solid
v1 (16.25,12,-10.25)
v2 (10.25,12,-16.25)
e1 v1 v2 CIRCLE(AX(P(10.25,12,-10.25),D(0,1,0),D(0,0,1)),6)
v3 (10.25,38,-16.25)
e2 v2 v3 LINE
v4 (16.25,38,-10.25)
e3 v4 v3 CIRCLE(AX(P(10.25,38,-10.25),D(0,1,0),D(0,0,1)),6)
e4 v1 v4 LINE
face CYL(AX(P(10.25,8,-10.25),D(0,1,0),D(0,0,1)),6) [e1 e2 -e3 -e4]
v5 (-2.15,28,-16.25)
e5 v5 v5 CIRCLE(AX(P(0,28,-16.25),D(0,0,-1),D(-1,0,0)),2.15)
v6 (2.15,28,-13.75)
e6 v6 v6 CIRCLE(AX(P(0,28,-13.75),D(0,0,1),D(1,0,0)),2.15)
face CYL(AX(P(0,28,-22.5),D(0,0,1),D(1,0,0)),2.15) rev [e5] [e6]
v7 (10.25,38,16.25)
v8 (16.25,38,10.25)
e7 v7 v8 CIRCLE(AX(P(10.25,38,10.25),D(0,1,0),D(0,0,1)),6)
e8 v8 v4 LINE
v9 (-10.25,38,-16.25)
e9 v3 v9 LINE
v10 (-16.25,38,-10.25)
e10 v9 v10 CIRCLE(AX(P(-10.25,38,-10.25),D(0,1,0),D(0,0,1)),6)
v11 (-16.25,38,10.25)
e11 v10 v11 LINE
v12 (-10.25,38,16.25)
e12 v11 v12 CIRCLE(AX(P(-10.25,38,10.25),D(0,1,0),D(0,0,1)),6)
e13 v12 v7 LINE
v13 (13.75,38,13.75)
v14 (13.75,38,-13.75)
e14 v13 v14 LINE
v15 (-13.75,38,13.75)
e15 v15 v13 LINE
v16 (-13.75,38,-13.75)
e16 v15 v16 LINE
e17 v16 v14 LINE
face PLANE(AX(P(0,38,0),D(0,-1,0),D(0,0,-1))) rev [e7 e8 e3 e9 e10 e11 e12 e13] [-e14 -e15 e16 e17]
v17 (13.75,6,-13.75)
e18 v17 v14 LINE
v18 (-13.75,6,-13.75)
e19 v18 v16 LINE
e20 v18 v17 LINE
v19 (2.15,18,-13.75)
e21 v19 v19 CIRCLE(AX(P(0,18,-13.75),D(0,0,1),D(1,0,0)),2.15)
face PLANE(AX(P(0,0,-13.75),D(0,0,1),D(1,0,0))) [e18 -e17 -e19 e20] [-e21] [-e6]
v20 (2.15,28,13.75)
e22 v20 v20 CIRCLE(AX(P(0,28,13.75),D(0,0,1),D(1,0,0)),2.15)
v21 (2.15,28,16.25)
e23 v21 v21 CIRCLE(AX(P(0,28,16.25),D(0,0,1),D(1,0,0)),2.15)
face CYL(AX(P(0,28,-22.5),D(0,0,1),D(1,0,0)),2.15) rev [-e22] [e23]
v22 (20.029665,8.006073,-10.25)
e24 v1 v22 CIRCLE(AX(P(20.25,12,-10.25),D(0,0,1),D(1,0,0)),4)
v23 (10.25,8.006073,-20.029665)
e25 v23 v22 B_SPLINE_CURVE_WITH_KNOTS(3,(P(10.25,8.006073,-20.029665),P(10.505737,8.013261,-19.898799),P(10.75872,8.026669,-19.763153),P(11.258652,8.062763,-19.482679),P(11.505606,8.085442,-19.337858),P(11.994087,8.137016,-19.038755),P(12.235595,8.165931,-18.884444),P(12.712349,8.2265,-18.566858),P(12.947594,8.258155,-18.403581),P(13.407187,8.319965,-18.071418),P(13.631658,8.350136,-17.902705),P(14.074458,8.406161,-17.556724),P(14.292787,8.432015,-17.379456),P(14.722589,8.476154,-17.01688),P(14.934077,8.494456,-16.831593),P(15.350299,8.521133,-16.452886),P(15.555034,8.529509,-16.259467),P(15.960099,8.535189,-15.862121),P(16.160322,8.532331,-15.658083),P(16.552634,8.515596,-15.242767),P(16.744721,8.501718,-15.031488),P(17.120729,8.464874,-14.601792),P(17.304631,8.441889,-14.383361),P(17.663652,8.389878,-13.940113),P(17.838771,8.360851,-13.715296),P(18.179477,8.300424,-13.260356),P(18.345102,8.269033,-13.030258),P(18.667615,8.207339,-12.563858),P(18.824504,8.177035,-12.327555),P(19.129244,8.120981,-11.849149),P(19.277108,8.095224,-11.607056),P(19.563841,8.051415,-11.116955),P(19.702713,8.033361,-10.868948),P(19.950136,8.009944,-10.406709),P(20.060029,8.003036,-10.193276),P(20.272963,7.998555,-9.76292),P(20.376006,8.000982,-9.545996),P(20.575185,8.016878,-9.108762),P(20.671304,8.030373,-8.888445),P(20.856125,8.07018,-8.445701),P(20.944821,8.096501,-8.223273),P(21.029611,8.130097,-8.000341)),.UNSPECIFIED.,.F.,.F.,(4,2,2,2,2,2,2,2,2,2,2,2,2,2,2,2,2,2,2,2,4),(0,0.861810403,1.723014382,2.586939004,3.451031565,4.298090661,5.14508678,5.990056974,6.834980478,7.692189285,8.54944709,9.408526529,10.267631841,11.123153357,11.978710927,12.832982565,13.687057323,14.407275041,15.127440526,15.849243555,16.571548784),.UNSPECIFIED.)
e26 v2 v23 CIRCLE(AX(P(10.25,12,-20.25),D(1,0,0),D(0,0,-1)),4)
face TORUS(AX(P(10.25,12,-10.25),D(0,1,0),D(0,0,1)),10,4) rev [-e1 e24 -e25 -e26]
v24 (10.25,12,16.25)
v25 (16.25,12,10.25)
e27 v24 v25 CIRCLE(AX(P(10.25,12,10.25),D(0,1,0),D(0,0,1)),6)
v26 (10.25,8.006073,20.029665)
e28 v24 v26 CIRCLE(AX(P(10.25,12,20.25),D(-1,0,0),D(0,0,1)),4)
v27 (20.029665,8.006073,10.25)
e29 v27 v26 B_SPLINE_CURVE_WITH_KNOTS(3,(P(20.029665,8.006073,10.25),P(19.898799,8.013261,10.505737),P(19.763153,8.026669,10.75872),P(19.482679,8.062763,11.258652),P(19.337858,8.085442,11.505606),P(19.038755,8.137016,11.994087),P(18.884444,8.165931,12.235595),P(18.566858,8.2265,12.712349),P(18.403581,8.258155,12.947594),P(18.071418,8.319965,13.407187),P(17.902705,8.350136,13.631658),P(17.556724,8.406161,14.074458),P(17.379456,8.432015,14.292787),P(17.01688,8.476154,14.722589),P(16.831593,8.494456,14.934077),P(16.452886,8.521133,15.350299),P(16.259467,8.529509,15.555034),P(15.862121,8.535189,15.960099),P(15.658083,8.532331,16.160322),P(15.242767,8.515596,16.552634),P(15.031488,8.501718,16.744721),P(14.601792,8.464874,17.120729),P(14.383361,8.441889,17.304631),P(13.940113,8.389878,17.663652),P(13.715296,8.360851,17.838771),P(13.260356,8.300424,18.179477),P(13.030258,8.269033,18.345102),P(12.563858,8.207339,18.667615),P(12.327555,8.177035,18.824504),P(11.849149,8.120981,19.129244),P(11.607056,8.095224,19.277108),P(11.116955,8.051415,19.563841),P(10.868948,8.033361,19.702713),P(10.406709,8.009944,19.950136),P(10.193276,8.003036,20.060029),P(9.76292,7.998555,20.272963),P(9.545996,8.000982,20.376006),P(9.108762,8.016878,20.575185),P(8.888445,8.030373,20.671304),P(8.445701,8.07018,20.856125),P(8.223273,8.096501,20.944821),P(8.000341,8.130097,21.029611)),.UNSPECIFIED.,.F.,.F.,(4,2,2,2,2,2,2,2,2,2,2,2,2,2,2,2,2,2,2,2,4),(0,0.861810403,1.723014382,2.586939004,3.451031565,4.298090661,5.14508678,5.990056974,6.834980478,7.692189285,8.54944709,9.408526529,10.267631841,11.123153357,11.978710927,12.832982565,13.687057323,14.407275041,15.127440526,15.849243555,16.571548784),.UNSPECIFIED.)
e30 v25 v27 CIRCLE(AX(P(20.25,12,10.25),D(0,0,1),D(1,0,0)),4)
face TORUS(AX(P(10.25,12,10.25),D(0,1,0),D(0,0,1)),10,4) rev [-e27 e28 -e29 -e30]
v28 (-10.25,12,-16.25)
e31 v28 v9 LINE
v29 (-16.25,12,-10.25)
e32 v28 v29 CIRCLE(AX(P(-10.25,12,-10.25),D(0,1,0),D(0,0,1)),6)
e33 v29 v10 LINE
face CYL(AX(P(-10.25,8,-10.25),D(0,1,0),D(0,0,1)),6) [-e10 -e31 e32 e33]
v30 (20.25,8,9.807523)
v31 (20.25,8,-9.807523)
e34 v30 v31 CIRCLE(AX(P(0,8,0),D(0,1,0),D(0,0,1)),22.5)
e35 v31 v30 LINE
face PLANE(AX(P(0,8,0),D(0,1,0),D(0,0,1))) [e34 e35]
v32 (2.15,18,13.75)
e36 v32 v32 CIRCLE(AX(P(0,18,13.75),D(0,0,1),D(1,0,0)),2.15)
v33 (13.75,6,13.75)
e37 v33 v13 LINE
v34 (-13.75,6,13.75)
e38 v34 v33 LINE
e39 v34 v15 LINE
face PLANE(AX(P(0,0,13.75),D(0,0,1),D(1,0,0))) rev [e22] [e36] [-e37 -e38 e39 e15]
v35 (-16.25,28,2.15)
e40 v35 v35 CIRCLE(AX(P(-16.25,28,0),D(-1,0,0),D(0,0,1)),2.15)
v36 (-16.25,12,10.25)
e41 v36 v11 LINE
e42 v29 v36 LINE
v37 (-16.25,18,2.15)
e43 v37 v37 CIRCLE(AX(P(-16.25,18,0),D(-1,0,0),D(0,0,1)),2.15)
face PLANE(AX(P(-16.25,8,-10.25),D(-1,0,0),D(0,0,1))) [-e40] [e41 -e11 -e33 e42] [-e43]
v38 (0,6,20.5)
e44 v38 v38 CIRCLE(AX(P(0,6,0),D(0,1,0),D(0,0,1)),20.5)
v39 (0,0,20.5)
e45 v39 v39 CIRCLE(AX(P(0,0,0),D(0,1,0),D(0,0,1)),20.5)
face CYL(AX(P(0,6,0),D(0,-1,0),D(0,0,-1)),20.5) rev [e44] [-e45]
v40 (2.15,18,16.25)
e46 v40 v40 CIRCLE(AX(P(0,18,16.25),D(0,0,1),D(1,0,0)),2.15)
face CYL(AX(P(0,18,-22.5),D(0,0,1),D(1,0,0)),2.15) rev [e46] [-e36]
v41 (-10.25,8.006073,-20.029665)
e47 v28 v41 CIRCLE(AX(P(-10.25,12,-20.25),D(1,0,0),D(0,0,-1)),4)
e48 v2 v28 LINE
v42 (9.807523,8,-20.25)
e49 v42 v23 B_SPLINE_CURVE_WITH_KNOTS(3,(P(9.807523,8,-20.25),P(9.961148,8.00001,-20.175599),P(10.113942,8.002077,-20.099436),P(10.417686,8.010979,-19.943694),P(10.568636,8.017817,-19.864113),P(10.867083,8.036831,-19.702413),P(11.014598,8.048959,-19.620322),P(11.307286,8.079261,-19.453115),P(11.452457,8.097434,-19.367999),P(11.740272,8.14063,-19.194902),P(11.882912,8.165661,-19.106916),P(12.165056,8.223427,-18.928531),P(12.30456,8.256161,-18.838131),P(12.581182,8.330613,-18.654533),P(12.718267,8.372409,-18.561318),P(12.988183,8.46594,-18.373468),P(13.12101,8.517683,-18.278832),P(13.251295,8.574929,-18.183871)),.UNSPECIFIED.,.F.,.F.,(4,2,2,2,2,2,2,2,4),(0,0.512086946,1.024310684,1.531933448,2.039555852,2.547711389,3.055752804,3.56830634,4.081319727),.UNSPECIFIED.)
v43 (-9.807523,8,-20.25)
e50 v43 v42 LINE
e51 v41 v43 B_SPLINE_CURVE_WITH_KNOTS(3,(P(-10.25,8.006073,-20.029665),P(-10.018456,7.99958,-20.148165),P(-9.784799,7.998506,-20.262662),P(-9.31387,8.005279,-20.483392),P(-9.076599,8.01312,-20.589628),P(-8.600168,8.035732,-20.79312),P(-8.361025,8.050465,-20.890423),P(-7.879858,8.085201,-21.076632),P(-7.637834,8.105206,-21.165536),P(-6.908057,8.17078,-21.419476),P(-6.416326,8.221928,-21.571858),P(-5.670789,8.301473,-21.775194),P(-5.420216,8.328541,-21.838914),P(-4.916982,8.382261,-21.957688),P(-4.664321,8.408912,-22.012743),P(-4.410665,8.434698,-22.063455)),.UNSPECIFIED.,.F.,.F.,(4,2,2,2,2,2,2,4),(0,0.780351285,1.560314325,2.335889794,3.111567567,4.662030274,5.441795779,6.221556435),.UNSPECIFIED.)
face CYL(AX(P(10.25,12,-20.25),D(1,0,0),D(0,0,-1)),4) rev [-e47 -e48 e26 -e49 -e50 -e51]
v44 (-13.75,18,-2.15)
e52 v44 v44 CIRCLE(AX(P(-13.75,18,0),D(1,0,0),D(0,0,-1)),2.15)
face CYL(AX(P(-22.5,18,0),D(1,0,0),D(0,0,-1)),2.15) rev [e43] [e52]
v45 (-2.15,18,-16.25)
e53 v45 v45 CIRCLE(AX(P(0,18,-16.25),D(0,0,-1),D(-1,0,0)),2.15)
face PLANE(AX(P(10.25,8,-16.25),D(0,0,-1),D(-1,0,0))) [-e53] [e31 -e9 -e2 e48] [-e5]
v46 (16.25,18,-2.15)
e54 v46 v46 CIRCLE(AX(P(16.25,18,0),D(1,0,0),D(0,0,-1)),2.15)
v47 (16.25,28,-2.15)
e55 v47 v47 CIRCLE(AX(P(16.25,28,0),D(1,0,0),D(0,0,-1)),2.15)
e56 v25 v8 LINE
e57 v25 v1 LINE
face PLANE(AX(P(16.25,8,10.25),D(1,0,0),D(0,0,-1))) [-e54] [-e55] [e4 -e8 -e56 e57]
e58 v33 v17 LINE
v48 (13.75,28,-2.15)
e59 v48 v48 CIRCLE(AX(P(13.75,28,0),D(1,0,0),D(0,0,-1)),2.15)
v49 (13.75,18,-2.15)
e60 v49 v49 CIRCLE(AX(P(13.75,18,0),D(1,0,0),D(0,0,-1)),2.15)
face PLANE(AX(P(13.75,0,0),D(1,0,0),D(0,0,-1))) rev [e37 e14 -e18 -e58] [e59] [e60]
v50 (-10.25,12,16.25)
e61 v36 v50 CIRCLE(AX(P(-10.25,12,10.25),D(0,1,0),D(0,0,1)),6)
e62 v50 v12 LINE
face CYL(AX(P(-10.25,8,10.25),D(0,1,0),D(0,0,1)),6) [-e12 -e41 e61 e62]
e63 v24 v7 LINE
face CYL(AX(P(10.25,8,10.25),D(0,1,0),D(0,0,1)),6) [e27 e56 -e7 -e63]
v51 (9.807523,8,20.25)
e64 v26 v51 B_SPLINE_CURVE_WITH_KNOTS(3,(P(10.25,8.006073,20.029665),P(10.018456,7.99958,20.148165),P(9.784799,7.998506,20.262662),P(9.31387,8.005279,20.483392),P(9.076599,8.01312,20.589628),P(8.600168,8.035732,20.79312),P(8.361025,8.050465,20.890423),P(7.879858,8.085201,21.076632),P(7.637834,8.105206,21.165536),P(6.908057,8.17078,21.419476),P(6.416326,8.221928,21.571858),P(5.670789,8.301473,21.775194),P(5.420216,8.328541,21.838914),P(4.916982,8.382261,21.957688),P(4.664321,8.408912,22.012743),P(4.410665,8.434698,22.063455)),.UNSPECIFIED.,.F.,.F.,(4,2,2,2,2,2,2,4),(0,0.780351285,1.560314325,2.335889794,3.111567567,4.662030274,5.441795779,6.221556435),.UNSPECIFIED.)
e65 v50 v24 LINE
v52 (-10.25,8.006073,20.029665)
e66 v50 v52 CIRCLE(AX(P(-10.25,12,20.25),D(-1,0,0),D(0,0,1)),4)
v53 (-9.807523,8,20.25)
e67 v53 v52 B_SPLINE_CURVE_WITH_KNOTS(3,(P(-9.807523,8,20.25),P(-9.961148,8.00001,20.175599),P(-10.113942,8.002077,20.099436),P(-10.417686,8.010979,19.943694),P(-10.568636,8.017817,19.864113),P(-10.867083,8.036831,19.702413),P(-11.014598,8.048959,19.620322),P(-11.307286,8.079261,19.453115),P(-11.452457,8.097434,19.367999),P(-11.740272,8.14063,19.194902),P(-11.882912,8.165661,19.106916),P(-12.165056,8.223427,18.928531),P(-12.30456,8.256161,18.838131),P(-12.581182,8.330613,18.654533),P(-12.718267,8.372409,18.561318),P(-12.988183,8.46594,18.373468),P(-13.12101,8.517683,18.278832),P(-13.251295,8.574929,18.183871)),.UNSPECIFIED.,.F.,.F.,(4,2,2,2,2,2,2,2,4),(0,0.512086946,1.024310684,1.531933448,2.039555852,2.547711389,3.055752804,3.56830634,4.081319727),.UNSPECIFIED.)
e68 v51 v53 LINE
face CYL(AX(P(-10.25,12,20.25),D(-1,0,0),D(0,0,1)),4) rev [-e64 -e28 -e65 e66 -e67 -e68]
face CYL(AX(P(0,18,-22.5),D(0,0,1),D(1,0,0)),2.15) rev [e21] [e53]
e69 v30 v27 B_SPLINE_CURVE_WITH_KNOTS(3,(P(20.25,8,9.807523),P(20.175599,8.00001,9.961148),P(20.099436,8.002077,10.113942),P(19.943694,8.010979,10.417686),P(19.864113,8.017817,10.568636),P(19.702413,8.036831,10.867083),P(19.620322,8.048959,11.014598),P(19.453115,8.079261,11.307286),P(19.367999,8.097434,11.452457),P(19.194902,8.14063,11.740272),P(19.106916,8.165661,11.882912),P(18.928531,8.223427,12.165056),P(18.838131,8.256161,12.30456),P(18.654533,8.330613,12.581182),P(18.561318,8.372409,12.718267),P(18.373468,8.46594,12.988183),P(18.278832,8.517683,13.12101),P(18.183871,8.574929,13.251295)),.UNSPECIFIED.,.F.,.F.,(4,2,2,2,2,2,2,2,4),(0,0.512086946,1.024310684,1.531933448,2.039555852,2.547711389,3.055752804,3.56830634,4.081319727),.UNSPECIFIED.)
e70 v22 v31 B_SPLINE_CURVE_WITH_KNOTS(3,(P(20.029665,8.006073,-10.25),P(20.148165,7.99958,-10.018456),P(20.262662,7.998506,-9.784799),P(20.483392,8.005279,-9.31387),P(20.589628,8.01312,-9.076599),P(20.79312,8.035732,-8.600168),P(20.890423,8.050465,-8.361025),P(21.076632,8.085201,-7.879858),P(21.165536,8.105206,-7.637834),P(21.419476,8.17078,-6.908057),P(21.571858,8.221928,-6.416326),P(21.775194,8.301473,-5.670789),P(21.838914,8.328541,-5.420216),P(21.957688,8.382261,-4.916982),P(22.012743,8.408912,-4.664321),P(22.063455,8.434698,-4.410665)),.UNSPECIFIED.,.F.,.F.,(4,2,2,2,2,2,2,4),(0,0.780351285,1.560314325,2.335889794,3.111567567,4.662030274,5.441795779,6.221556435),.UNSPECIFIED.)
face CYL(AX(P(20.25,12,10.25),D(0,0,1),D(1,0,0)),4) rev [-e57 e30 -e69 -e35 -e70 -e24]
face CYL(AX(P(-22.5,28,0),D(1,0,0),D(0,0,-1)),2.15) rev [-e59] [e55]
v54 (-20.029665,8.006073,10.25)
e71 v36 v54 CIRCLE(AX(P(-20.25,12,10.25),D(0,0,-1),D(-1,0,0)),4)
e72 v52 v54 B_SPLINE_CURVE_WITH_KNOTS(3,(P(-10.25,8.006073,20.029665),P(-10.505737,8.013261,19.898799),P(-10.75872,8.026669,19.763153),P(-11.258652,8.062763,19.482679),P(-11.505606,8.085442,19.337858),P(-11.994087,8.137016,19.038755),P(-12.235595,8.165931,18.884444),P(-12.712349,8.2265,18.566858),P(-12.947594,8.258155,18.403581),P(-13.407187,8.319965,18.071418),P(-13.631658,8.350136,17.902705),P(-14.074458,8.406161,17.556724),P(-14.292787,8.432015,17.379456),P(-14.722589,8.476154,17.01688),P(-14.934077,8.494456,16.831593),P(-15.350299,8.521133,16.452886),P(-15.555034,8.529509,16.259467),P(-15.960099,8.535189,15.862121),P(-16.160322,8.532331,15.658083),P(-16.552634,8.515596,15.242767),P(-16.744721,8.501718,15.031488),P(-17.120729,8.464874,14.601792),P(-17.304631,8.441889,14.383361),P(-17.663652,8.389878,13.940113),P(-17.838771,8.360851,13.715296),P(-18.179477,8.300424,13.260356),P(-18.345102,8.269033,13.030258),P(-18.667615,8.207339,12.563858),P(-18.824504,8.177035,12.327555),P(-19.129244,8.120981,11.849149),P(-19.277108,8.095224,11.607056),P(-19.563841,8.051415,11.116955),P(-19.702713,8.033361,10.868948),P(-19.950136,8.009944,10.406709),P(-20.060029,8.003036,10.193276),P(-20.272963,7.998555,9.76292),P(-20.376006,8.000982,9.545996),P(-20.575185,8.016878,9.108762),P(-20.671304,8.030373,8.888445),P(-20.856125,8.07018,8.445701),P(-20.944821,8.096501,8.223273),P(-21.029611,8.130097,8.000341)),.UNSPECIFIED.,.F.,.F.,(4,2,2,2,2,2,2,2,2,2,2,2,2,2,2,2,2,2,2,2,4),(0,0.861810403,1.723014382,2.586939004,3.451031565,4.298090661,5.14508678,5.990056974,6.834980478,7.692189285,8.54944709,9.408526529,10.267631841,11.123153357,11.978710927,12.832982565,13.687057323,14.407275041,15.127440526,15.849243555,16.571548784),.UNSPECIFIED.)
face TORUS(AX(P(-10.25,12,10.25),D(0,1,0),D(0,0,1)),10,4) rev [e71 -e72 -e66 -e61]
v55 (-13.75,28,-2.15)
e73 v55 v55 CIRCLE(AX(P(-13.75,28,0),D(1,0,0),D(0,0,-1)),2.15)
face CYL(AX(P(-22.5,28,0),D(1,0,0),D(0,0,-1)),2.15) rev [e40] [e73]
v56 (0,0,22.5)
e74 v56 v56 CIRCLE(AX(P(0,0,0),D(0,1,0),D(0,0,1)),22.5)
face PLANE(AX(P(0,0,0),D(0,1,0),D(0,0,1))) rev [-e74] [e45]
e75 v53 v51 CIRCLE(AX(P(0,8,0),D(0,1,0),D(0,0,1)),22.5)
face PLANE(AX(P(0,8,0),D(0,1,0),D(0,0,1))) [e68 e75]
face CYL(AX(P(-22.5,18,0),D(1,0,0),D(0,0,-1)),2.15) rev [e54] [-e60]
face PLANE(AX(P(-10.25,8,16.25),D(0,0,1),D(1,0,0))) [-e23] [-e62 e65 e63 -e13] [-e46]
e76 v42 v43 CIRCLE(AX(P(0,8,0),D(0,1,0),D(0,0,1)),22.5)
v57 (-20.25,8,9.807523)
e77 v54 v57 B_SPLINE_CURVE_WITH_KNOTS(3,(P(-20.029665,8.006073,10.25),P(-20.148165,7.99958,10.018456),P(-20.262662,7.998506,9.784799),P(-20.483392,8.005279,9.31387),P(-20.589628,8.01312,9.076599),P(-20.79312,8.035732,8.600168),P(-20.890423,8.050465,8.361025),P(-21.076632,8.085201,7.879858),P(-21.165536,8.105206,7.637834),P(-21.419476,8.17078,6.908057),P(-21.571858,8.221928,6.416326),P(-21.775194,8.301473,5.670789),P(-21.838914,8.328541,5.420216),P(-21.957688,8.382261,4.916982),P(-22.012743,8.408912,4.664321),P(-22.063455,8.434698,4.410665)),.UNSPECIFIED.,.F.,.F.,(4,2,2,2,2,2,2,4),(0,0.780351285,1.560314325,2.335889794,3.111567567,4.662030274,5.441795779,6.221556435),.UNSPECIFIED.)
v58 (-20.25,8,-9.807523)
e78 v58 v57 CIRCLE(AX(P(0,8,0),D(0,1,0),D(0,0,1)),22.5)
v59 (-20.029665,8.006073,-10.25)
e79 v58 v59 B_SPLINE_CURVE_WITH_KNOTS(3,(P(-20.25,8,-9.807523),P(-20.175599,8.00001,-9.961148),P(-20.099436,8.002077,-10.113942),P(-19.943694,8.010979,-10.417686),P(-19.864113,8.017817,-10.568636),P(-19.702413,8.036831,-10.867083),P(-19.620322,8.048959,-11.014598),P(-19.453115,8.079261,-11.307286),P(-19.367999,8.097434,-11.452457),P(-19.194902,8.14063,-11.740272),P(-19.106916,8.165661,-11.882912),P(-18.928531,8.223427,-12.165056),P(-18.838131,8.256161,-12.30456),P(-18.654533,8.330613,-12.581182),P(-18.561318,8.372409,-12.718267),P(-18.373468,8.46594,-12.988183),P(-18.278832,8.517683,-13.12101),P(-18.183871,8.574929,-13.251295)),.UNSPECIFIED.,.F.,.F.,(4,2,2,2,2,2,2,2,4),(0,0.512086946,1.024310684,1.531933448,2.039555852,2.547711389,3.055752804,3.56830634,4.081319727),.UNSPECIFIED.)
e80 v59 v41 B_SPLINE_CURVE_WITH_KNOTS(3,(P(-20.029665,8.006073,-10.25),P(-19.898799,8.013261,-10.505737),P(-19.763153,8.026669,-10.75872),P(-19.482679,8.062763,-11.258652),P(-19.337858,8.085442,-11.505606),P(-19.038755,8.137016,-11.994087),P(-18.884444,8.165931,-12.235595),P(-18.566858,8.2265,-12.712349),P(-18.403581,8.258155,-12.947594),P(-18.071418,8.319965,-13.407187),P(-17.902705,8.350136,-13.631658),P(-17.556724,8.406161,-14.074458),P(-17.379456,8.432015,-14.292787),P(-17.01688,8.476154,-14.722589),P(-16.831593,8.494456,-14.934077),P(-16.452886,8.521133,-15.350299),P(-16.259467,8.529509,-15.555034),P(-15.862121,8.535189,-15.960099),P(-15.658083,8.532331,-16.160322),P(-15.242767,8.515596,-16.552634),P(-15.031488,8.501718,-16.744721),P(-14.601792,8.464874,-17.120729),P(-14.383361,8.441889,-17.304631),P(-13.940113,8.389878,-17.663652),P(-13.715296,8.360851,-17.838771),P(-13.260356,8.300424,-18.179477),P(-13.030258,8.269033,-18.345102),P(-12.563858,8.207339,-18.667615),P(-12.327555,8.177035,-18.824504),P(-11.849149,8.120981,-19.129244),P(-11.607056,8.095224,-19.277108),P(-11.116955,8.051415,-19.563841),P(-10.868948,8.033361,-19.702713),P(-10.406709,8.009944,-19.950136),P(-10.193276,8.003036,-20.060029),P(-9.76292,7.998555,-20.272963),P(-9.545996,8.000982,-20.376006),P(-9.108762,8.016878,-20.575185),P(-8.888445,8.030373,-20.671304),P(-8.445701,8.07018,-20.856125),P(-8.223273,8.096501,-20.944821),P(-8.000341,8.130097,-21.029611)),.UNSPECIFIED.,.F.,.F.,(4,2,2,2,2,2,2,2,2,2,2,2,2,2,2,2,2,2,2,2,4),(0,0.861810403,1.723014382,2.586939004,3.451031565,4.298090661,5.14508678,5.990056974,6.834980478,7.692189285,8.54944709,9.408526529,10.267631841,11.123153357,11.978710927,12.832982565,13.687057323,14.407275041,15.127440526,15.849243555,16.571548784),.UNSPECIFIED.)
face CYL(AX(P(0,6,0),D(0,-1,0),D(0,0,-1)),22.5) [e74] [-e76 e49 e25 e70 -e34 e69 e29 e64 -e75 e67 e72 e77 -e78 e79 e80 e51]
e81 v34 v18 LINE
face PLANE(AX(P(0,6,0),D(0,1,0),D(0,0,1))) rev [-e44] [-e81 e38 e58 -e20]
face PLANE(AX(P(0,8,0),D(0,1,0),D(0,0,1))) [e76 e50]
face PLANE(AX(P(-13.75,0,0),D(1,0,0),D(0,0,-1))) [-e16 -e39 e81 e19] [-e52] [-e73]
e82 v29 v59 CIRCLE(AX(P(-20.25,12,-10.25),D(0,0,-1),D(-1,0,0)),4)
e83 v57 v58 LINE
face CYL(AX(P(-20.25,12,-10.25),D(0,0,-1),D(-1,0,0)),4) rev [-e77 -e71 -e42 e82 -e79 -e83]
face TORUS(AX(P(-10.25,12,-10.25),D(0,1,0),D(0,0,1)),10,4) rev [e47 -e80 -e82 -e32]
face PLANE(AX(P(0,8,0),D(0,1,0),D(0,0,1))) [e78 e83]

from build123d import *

# Parameters (mm, degrees)
SKETCH_1_R          = 22.5
SKETCH_1_R_2        = 20.5
EXTRUDE_1_DEPTH     = 6
SKETCH_2_R          = 22.5
EXTRUDE_2_DEPTH     = 2
SKETCH_3_W          = 26.5
SKETCH_3_H          = 26.5
SKETCH_3_W_2        = 20.5
SKETCH_3_H_2        = 20.5
EXTRUDE_3_DEPTH     = 30
SKETCH_4_R          = 2.15
CUT_EXTRUDE_1_DEPTH = 30
SKETCH_5_R          = 2.15
CUT_EXTRUDE_2_DEPTH = 30
FILLET_1_R          = 3
SKETCH_7_W          = 26.5
SKETCH_7_H          = 26.5
EXTRUDE_4_DEPTH     = 30
SKETCH_8_W          = 27.5
SKETCH_8_H          = 27.5
CUT_EXTRUDE_4_DEPTH = 50.563091106
FILLET_2_R          = 4
SKETCH_9_R          = 2.15
CUT_EXTRUDE_5_DEPTH = 59.752127725
SKETCH_10_R         = 2.15
CUT_EXTRUDE_6_DEPTH = 59.752127725


with BuildPart() as part:
    # 草图1 → 凸台-拉伸1 (new body)
    with BuildSketch(Plane(origin=(0, 0, 0), x_dir=(1, 0, 0), z_dir=(0, 1, 0))):
        with Locations(Location((0, 0, 0), (0, 0, 270))):
            Circle(SKETCH_1_R)
        with Locations(Location((0, 0, 0), (0, 0, 270))):
            Circle(SKETCH_1_R_2, mode=Mode.SUBTRACT)
    extrude(amount=EXTRUDE_1_DEPTH)

    # 草图2 → 凸台-拉伸2 (add)
    with BuildSketch(Plane(origin=(0, 6, 0), x_dir=(1, 0, 0), z_dir=(0, 1, 0))):
        with Locations(Location((0, 0, 0), (0, 0, 270))):
            Circle(SKETCH_2_R)
    extrude(amount=EXTRUDE_2_DEPTH)

    # 草图3 → 凸台-拉伸3 (add)
    with BuildSketch(Plane(origin=(0, 8, 0), x_dir=(1, 0, 0), z_dir=(0, 1, 0))):
        Rectangle(SKETCH_3_W, SKETCH_3_H)
        Rectangle(SKETCH_3_W_2, SKETCH_3_H_2, mode=Mode.SUBTRACT)
    extrude(amount=EXTRUDE_3_DEPTH)

    # 草图4 → 切除-拉伸1 (cut)
    with BuildSketch(Plane.XY.offset(13.25)):
        with Locations((0, 28)):
            Circle(SKETCH_4_R)
        with Locations((0, 18)):
            Circle(SKETCH_4_R)
    extrude(amount=-CUT_EXTRUDE_1_DEPTH, mode=Mode.SUBTRACT)

    # 草图5 → 切除-拉伸2 (cut)
    with BuildSketch(Plane(origin=(13.25, 0, 0), x_dir=(0, 0, -1), z_dir=(1, 0, 0))):
        with Locations((0, 28)):
            Circle(SKETCH_5_R)
        with Locations((0, 18)):
            Circle(SKETCH_5_R)
    extrude(amount=-CUT_EXTRUDE_2_DEPTH, mode=Mode.SUBTRACT)

    # 圆角1
    fillet_1_edges = [part.edges().sort_by_distance(p)[0] for p in [
        (-13.25, 23, -13.25),
        (-13.25, 23, 13.25),
        (13.25, 23, 13.25),
        (13.25, 23, -13.25),
    ]]
    fillet(fillet_1_edges, radius=FILLET_1_R)

    # 草图7 → 凸台-拉伸4 (add)
    with BuildSketch(Plane(origin=(0, 38, 0), x_dir=(1, 0, 0), z_dir=(0, 1, 0))):
        with BuildLine():
            Line((-16.25, 10.25), (-16.25, -10.25))
            ThreePointArc((-16.25, -10.25), (-14.492640687, -14.492640687), (-10.25, -16.25))
            Line((-10.25, -16.25), (10.25, -16.25))
            ThreePointArc((10.25, -16.25), (14.492640687, -14.492640687), (16.25, -10.25))
            Line((16.25, -10.25), (16.25, 10.25))
            ThreePointArc((16.25, 10.25), (14.492640687, 14.492640687), (10.25, 16.25))
            Line((10.25, 16.25), (-10.25, 16.25))
            ThreePointArc((-10.25, 16.25), (-14.492640687, 14.492640687), (-16.25, 10.25))
        make_face()
        Rectangle(SKETCH_7_W, SKETCH_7_H, mode=Mode.SUBTRACT)
    extrude(amount=-EXTRUDE_4_DEPTH)

    # 草图8 → 切除-拉伸4 (cut, through all)
    with BuildSketch(Plane(origin=(0, 38, 0), x_dir=(1, 0, 0), z_dir=(0, 1, 0))):
        Rectangle(SKETCH_8_W, SKETCH_8_H)
    extrude(amount=-CUT_EXTRUDE_4_DEPTH, mode=Mode.SUBTRACT)

    # 圆角2
    # the kernel refuses this fillet: 4 mm, written as the material it adds along each edge
    with BuildSketch(Plane(origin=(-10.25, 8, -10.25), x_dir=(0, 0, -1), z_dir=(1, 0, 0))) as fillet_2_piece_1_section:
        with BuildLine():
            CenterArc((6 + FILLET_2_R, FILLET_2_R), FILLET_2_R, 180, 90)
            Line((6, FILLET_2_R), (6, 0))
            Line((6, 0), (6 + FILLET_2_R, 0))
        make_face()
    fillet_2_piece_1 = revolve(axis=Axis((-10.25, 8, -10.25), (0, 1, 0)), revolution_arc=90, mode=Mode.PRIVATE)
    fillet_2_piece_1 = fillet_2_piece_1 & Plane(origin=(0, 8.919609383, 0), x_dir=(0, 0, 1), z_dir=(0, -1, 0)) * Cylinder(22.5, 40, mode=Mode.PRIVATE)
    add(fillet_2_piece_1)
    with BuildSketch(Plane(origin=(10.25, 8, -16.25), x_dir=(0, 0, -1), z_dir=(-1, 0, 0))) as fillet_2_piece_2_section:
        with BuildLine():
            CenterArc((FILLET_2_R, -FILLET_2_R), FILLET_2_R, 90, 90)
            Line((0, -FILLET_2_R), (0, 0))
            Line((0, 0), (FILLET_2_R, 0))
        make_face()
    fillet_2_piece_2 = extrude(amount=20.5, mode=Mode.PRIVATE)
    fillet_2_piece_2 = fillet_2_piece_2 & Plane(origin=(0, 8.90566888, 0), x_dir=(0, 0, 1), z_dir=(0, -1, 0)) * Cylinder(22.5, 57, mode=Mode.PRIVATE)
    add(fillet_2_piece_2)
    with BuildSketch(Plane(origin=(10.25, 8, -10.25), x_dir=(1, 0, 0), z_dir=(0, 0, 1))) as fillet_2_piece_3_section:
        with BuildLine():
            CenterArc((6 + FILLET_2_R, FILLET_2_R), FILLET_2_R, 180, 90)
            Line((6, FILLET_2_R), (6, 0))
            Line((6, 0), (6 + FILLET_2_R, 0))
        make_face()
    fillet_2_piece_3 = revolve(axis=Axis((10.25, 8, -10.25), (0, 1, 0)), revolution_arc=90, mode=Mode.PRIVATE)
    fillet_2_piece_3 = fillet_2_piece_3 & Plane(origin=(0, 8.919609383, 0), x_dir=(0, 0, 1), z_dir=(0, -1, 0)) * Cylinder(22.5, 40, mode=Mode.PRIVATE)
    add(fillet_2_piece_3)
    with BuildSketch(Plane(origin=(16.25, 8, 10.25), x_dir=(1, 0, 0), z_dir=(0, 0, -1))) as fillet_2_piece_4_section:
        with BuildLine():
            CenterArc((FILLET_2_R, -FILLET_2_R), FILLET_2_R, 90, 90)
            Line((0, -FILLET_2_R), (0, 0))
            Line((0, 0), (FILLET_2_R, 0))
        make_face()
    fillet_2_piece_4 = extrude(amount=20.5, mode=Mode.PRIVATE)
    fillet_2_piece_4 = fillet_2_piece_4 & Plane(origin=(0, 8.90566888, 0), x_dir=(0, 0, 1), z_dir=(0, -1, 0)) * Cylinder(22.5, 57, mode=Mode.PRIVATE)
    add(fillet_2_piece_4)
    with BuildSketch(Plane(origin=(10.25, 8, 10.25), x_dir=(0, 0, 1), z_dir=(-1, 0, 0))) as fillet_2_piece_5_section:
        with BuildLine():
            CenterArc((6 + FILLET_2_R, FILLET_2_R), FILLET_2_R, 180, 90)
            Line((6, FILLET_2_R), (6, 0))
            Line((6, 0), (6 + FILLET_2_R, 0))
        make_face()
    fillet_2_piece_5 = revolve(axis=Axis((10.25, 8, 10.25), (0, 1, 0)), revolution_arc=90, mode=Mode.PRIVATE)
    fillet_2_piece_5 = fillet_2_piece_5 & Plane(origin=(0, 8.919609383, 0), x_dir=(0, 0, 1), z_dir=(0, -1, 0)) * Cylinder(22.5, 40, mode=Mode.PRIVATE)
    add(fillet_2_piece_5)
    with BuildSketch(Plane(origin=(-10.25, 8, 16.25), x_dir=(0, 0, 1), z_dir=(1, 0, 0))) as fillet_2_piece_6_section:
        with BuildLine():
            CenterArc((FILLET_2_R, -FILLET_2_R), FILLET_2_R, 90, 90)
            Line((0, -FILLET_2_R), (0, 0))
            Line((0, 0), (FILLET_2_R, 0))
        make_face()
    fillet_2_piece_6 = extrude(amount=20.5, mode=Mode.PRIVATE)
    fillet_2_piece_6 = fillet_2_piece_6 & Plane(origin=(0, 8.90566888, 0), x_dir=(0, 0, 1), z_dir=(0, -1, 0)) * Cylinder(22.5, 57, mode=Mode.PRIVATE)
    add(fillet_2_piece_6)
    with BuildSketch(Plane(origin=(-10.25, 8, 10.25), x_dir=(-1, 0, 0), z_dir=(0, 0, -1))) as fillet_2_piece_7_section:
        with BuildLine():
            CenterArc((6 + FILLET_2_R, FILLET_2_R), FILLET_2_R, 180, 90)
            Line((6, FILLET_2_R), (6, 0))
            Line((6, 0), (6 + FILLET_2_R, 0))
        make_face()
    fillet_2_piece_7 = revolve(axis=Axis((-10.25, 8, 10.25), (0, 1, 0)), revolution_arc=90, mode=Mode.PRIVATE)
    fillet_2_piece_7 = fillet_2_piece_7 & Plane(origin=(0, 8.919609383, 0), x_dir=(0, 0, 1), z_dir=(0, -1, 0)) * Cylinder(22.5, 40, mode=Mode.PRIVATE)
    add(fillet_2_piece_7)
    with BuildSketch(Plane(origin=(-16.25, 8, -10.25), x_dir=(-1, 0, 0), z_dir=(0, 0, 1))) as fillet_2_piece_8_section:
        with BuildLine():
            CenterArc((FILLET_2_R, -FILLET_2_R), FILLET_2_R, 90, 90)
            Line((0, -FILLET_2_R), (0, 0))
            Line((0, 0), (FILLET_2_R, 0))
        make_face()
    fillet_2_piece_8 = extrude(amount=20.5, mode=Mode.PRIVATE)
    fillet_2_piece_8 = fillet_2_piece_8 & Plane(origin=(0, 8.90566888, 0), x_dir=(0, 0, 1), z_dir=(0, -1, 0)) * Cylinder(22.5, 57, mode=Mode.PRIVATE)
    add(fillet_2_piece_8)

    # 草图9 → 切除-拉伸5 (cut, through all)
    with BuildSketch(Plane(origin=(16.25, 0, 0), x_dir=(0, 0, -1), z_dir=(1, 0, 0))):
        with Locations((0, 28)):
            Circle(SKETCH_9_R)
        with Locations((0, 18)):
            Circle(SKETCH_9_R)
    extrude(amount=-CUT_EXTRUDE_5_DEPTH, mode=Mode.SUBTRACT)

    # 草图10 → 切除-拉伸6 (cut, through all)
    with BuildSketch(Plane.XY.offset(16.25)):
        with Locations((0, 28)):
            Circle(SKETCH_10_R)
        with Locations((0, 18)):
            Circle(SKETCH_10_R)
    extrude(amount=-CUT_EXTRUDE_6_DEPTH, mode=Mode.SUBTRACT)


solid = part.part
